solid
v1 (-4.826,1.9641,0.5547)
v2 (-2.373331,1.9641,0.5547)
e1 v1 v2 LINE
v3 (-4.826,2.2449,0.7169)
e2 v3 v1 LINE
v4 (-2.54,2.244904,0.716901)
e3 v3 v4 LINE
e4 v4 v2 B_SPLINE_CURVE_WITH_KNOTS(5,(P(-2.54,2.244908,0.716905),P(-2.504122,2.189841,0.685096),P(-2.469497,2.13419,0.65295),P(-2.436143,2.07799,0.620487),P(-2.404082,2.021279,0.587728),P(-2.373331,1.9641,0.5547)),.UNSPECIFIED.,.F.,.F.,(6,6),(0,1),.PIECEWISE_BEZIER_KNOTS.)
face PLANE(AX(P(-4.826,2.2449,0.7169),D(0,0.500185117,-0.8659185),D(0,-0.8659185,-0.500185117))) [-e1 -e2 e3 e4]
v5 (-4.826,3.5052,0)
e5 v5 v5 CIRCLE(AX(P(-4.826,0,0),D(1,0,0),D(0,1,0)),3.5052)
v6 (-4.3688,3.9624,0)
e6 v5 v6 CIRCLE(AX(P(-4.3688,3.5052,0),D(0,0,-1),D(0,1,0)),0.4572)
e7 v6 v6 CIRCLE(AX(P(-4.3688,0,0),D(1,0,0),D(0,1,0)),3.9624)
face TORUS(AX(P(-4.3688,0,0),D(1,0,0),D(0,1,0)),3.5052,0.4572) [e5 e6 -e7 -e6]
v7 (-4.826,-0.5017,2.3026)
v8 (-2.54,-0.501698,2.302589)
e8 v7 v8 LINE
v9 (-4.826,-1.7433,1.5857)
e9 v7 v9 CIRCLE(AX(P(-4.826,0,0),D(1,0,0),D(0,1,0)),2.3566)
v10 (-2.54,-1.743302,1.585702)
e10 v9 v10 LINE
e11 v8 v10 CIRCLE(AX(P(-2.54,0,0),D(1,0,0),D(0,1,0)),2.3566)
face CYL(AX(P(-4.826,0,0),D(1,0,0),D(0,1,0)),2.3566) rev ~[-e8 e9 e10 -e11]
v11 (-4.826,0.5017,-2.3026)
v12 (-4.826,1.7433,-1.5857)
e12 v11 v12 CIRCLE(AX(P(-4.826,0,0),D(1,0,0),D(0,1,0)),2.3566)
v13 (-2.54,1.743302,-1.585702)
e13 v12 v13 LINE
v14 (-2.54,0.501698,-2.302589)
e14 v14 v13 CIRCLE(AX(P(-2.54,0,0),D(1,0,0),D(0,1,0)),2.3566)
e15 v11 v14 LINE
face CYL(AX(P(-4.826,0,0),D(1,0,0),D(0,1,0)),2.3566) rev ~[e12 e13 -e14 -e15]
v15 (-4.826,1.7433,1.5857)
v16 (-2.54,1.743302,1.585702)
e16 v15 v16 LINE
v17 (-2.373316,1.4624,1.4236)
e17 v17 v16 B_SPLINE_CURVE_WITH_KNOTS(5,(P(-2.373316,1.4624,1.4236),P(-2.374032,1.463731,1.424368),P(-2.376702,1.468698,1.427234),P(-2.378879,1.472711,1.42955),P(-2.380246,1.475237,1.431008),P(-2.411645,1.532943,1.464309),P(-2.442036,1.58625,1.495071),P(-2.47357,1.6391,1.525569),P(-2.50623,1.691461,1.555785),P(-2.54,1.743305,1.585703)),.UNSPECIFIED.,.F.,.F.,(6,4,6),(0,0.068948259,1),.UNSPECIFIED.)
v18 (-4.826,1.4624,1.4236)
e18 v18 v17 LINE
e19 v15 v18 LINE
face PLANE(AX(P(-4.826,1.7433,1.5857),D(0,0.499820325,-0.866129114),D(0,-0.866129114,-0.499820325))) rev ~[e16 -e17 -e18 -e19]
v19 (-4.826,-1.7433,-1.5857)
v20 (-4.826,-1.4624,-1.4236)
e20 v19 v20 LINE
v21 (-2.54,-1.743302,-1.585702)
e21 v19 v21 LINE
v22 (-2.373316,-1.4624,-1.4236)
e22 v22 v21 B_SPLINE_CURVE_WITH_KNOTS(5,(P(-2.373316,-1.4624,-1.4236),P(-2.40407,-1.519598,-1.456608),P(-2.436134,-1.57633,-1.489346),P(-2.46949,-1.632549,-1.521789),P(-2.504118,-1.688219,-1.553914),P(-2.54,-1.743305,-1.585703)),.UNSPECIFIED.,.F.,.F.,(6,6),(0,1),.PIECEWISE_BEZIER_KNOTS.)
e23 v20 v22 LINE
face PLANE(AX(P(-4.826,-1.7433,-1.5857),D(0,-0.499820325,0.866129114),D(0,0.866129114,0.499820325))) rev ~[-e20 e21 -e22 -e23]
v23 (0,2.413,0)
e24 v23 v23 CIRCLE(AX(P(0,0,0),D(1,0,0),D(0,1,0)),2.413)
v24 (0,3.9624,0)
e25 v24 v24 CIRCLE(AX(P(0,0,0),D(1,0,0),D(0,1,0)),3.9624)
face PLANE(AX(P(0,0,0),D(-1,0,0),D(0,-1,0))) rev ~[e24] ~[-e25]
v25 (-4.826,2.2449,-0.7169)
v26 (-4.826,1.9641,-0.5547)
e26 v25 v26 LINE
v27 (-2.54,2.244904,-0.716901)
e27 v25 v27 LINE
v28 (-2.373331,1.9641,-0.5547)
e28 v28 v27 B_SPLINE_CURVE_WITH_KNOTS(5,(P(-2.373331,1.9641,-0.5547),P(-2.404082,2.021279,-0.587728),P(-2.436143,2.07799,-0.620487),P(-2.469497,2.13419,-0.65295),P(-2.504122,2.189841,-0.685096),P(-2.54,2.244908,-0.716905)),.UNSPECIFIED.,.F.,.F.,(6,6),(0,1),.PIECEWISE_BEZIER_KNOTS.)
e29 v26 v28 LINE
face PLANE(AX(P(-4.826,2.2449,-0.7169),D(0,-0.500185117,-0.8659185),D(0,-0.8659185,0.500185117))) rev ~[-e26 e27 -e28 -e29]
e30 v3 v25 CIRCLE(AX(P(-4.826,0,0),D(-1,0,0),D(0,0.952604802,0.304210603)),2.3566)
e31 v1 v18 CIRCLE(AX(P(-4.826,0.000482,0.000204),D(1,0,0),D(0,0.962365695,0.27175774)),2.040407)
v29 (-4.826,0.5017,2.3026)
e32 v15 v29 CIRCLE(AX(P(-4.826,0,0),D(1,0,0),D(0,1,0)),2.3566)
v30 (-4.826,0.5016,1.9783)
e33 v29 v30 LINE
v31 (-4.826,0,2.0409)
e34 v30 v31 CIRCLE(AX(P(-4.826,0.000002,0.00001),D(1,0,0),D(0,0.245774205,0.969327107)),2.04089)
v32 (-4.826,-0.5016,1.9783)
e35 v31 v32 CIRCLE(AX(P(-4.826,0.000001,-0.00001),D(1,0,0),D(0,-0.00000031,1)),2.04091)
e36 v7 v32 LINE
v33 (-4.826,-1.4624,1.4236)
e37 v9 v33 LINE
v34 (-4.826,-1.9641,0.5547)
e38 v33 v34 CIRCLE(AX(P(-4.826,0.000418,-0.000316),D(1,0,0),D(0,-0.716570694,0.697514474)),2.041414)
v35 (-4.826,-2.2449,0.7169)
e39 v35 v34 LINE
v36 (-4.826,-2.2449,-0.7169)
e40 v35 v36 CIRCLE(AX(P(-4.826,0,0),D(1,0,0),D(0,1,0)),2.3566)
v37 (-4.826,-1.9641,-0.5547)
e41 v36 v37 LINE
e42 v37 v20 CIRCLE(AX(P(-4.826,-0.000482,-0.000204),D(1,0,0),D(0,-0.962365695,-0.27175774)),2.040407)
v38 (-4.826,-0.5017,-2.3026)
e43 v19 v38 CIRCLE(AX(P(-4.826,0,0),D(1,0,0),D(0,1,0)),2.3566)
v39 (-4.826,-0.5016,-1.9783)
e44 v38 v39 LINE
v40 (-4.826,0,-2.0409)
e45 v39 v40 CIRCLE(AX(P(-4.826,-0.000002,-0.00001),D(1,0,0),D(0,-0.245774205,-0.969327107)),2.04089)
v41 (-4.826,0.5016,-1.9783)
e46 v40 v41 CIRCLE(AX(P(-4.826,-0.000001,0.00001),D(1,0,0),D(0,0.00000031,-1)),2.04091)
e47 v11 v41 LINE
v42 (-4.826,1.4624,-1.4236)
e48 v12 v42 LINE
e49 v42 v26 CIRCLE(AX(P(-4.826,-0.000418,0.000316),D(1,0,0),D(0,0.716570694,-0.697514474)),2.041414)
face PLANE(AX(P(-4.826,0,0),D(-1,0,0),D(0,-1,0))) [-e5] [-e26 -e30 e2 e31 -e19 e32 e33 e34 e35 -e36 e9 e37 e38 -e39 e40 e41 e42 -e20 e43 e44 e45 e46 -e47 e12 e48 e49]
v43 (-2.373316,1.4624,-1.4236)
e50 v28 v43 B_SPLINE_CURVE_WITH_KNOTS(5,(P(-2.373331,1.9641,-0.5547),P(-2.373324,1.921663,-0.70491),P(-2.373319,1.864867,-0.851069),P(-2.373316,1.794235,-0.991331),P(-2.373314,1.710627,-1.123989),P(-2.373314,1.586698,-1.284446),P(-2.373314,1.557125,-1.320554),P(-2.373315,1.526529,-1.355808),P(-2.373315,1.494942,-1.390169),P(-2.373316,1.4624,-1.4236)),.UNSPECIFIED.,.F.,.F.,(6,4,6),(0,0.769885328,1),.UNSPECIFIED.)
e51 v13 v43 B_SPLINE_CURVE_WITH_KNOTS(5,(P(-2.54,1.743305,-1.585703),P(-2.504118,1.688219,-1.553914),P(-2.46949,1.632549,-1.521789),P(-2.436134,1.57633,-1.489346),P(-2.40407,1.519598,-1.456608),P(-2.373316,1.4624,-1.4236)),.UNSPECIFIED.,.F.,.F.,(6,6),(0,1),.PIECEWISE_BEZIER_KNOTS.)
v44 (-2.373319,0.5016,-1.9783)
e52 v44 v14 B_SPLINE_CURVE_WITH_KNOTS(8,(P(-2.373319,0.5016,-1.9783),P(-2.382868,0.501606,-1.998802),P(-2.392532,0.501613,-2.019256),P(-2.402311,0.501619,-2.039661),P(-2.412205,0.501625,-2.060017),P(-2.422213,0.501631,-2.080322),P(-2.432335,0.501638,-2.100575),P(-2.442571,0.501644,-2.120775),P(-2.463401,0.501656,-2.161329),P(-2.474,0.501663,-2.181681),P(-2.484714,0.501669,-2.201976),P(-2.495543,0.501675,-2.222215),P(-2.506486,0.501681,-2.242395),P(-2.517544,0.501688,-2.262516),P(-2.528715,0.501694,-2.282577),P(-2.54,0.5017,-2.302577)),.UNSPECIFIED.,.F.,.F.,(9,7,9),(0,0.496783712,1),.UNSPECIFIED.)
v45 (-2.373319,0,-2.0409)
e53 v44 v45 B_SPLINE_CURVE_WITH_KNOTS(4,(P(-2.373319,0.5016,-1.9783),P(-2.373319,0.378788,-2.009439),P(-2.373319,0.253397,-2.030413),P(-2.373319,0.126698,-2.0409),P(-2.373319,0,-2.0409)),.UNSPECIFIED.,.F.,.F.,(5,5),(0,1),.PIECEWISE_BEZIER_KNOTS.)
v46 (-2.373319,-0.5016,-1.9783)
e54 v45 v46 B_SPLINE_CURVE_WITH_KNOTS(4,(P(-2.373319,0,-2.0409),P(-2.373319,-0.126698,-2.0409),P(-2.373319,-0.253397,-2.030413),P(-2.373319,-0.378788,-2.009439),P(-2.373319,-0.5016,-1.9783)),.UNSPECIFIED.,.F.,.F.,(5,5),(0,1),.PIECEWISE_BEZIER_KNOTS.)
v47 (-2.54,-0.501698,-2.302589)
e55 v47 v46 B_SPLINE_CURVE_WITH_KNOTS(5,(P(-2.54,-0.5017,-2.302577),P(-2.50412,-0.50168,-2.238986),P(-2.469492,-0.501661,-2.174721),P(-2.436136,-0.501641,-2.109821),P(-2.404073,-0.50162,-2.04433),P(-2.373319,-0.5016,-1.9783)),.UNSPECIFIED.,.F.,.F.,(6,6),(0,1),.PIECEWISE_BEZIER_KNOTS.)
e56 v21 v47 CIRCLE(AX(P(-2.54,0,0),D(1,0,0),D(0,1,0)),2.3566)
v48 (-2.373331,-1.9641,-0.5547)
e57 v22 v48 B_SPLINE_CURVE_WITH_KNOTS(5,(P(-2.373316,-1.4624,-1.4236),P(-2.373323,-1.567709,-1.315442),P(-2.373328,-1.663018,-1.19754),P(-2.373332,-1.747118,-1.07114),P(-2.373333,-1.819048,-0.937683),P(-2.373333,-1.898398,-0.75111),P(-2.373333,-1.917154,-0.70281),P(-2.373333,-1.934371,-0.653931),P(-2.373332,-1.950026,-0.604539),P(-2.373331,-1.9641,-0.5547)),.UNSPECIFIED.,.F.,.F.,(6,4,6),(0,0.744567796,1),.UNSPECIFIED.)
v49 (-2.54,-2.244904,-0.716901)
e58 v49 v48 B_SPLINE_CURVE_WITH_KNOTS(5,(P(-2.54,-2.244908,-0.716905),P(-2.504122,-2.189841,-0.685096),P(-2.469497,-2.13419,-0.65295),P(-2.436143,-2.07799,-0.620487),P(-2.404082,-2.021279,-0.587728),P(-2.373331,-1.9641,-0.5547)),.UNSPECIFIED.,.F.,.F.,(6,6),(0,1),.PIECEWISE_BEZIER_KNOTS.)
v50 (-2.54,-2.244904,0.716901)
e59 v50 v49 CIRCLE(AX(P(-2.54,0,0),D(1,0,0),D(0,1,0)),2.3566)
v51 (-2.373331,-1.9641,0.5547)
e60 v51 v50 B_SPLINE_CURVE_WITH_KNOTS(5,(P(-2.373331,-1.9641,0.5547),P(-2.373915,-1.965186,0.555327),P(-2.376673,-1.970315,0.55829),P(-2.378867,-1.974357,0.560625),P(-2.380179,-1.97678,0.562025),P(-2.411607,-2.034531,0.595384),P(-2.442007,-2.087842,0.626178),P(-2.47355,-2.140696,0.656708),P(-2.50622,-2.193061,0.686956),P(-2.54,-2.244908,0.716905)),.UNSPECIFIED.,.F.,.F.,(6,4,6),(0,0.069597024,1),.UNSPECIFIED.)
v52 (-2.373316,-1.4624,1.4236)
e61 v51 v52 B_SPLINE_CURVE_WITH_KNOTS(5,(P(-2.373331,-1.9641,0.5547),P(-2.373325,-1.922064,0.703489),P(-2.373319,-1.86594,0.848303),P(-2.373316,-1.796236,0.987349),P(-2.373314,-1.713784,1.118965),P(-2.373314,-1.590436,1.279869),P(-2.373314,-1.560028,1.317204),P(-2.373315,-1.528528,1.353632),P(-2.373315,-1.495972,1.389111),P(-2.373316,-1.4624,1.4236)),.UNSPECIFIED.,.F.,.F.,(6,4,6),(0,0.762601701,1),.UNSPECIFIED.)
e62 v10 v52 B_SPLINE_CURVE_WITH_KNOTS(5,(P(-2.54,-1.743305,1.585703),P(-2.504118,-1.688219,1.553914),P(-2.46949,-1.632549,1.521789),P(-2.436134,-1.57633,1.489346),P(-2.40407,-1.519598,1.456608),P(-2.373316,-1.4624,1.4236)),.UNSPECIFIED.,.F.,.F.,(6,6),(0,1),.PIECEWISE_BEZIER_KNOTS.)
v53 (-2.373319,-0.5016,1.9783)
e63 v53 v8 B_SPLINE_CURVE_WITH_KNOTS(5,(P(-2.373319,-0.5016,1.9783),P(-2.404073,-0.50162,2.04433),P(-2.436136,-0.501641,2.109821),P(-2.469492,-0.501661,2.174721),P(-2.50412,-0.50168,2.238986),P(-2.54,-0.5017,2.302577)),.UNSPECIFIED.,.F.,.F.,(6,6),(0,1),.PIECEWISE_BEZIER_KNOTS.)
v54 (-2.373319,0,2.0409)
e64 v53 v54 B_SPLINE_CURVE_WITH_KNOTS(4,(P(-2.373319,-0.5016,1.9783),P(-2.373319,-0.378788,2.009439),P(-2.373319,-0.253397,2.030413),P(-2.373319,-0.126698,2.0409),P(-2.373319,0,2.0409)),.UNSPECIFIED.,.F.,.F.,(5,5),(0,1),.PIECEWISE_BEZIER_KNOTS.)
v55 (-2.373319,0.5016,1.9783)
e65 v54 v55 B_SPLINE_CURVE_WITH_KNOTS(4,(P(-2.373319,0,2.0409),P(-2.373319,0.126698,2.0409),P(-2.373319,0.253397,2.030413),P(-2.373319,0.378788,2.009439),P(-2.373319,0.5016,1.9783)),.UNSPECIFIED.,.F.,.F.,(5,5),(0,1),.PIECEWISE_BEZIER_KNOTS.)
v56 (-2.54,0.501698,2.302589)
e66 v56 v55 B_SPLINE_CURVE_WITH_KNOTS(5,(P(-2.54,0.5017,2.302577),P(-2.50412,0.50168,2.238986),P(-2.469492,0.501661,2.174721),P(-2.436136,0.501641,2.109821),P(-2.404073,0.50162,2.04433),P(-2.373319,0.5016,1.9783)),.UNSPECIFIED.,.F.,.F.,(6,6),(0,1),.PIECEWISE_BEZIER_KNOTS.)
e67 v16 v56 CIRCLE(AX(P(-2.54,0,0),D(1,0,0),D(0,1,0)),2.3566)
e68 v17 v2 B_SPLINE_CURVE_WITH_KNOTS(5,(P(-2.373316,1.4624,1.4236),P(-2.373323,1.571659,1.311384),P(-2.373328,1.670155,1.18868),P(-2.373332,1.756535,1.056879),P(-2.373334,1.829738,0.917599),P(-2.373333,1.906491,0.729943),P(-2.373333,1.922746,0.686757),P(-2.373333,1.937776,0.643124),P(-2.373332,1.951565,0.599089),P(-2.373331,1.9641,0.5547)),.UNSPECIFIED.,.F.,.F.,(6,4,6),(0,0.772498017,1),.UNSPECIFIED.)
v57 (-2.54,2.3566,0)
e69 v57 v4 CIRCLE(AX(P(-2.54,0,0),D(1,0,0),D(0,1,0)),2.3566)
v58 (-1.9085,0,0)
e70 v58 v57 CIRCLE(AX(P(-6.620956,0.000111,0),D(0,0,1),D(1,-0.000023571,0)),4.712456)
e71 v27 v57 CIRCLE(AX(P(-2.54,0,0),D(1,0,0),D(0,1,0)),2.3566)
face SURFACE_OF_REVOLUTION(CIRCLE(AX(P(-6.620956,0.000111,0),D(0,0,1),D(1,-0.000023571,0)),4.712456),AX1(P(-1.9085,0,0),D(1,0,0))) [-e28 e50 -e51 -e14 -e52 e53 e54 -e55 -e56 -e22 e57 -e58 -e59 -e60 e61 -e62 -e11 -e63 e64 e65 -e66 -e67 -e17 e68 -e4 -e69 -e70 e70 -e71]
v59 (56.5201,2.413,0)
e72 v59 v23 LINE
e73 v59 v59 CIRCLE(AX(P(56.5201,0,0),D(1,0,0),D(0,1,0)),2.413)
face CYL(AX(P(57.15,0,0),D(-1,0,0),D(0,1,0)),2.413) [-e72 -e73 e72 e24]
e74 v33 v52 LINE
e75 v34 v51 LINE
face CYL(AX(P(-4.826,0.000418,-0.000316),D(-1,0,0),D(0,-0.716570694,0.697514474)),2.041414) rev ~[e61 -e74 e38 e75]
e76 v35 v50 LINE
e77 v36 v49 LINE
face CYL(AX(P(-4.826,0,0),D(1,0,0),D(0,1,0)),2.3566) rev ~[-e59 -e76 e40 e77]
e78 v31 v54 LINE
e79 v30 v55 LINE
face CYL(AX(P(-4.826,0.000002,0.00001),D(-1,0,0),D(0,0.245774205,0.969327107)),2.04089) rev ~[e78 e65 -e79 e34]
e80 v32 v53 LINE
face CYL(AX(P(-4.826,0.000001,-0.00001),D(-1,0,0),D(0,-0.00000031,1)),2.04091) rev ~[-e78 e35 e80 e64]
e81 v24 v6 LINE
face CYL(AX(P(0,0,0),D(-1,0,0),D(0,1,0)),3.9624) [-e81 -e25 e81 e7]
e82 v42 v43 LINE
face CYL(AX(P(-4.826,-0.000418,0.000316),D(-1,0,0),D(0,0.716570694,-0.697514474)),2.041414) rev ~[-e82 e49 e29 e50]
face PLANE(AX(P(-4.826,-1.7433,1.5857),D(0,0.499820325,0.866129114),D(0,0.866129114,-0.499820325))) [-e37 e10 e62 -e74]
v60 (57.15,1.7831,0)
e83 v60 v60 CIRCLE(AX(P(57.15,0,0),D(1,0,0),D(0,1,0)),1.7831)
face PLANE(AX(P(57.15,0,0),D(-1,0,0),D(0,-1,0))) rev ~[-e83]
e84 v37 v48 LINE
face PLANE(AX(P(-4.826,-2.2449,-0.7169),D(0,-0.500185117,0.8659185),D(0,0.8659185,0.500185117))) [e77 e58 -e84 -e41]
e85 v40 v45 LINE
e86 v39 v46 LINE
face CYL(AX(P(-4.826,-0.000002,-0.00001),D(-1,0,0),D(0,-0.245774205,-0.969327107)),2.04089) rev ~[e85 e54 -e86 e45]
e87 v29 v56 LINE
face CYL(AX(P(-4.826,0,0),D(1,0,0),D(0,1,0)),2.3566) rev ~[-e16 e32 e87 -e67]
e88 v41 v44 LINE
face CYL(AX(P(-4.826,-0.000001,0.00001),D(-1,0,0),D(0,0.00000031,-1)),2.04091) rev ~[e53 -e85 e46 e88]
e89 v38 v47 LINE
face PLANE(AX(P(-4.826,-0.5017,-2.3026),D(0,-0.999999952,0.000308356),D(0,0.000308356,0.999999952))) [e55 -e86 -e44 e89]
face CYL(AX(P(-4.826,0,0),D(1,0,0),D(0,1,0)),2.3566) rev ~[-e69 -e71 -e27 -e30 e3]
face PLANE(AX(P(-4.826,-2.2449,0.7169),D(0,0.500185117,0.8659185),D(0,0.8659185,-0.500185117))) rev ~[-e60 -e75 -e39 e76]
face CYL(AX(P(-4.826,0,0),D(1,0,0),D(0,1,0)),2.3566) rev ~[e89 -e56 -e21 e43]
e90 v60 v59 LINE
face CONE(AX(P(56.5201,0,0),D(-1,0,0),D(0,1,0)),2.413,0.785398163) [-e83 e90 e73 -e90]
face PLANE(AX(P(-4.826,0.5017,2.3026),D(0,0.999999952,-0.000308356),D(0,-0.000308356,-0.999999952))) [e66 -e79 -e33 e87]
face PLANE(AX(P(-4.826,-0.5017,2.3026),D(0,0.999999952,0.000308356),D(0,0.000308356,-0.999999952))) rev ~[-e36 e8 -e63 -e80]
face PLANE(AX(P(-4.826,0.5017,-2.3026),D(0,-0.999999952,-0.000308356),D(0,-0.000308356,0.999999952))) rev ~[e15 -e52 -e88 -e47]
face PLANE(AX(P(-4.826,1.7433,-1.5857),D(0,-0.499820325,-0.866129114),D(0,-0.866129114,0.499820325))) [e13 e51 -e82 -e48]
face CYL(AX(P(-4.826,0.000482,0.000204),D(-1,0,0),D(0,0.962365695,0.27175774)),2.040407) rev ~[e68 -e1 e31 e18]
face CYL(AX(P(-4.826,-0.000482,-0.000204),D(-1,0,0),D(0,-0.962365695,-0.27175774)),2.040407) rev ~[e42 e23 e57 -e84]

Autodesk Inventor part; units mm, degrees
ref_plane "YZ Plane" through (0, 0, 0) normal (1, 0, 0) x (0, 1, 0)
sketch "Sketch1" plane through (0, 0, 0) normal (0, 0, 1) x (1, 0, 0)
  line L0 (-4.826, 0) -> (57.15, 0)
  line L1 (57.15, 0) -> (57.15, 2.413)
  line L2 (57.15, 2.413) -> (0, 2.413)
  line L3 (0, 2.413) -> (0, 3.9624)
  line L4 (-19.3761, 0) -> (69.9044, 0) projected
  line L5 (0, -0.7925) -> (0, 4.7549) projected
  line L6 (0, 3.9624) -> (-4.826, 3.9624)
  line L7 (-4.826, 0) -> (-4.826, 3.9624)
  arc A0 (-1.9085, 0) -> (-2.54, 2.3566) centre (-6.6218, 0) ccw
  line L8 (-4.826, 2.3566) -> (-2.54, 2.3566)
  line L9 (12.7, 2.413) -> (0, 2.413) construction
  dimension "d0" = 57.15
  dimension "d1" = 4.826
  dimension "d2" = 4.826
  dimension "d5" = 7.9248
  dimension "d13" = 4.7132
  dimension "d14" = 4.7132
  dimension "d15" = 2.286
revolve "Body" add sketch "Sketch1" angle 360 about axis through (-4.826, 0, 0) along (1, 0, 0) contours A0 L8 L7 L6 L3 L5 L0 | L5 L2 L1 L0
ref_plane "IDS_WORKPLANE{1}" through (-4.826, 0, 0) normal (1, 0, 0) x (0, 0, -1)
sketch "Sketch2" plane through (-4.826, 0, 0) normal (1, 0, 0) x (0, 0, -1)
  line L0 (0, -5.5474) -> (0, 5.5474) projected
  line L1 (5.7744, 0) -> (-5.5852, 0) projected
  circle A0 centre (0, 0) radius 3.9624 projected
  line L2 (2.3026, 0.5017) -> (1.9783, 0.5016)
  line L3 (0, 0) -> (2.3026, 0.5017) construction
  line L4 (0, 0) -> (4.1516, 3.7764) construction
  line L5 (0, 0) -> (0.7169, 2.2449) construction
  line L6 (0, 0) -> (1.1783, 2.0409) construction
  line L7 (0.7169, 2.2449) -> (0.5547, 1.9641)
  line L8 (1.5857, 1.7433) -> (1.4236, 1.4624)
  line L9 (0, 0) -> (1.5857, 1.7433) construction
  arc A1 (2.0409, 0) -> (1.9783, 0.5016) centre (0, 0) ccw
  arc A2 (1.4236, 1.4624) -> (0.5547, 1.9641) centre (0, 0) ccw
  arc A3 (2.3566, 0) -> (2.3026, 0.5017) centre (0, 0) ccw
  arc A4 (1.5857, 1.7433) -> (0.7169, 2.2449) centre (0, 0) ccw
  arc A5 (2.3026, 0.5017) -> (1.3897, 1.9032) centre (0, 0) ccw construction
  arc A6 (1.9783, 0.5016) -> (1.4236, 1.4624) centre (0, 0) ccw construction
  line L10 (2.3026, -0.5017) -> (1.9783, -0.5016)
  line L11 (0.7169, -2.2449) -> (0.5547, -1.9641)
  line L12 (1.5857, -1.7433) -> (1.4236, -1.4624)
  arc A7 (1.9783, -0.5016) -> (2.0409, 0) centre (0, 0) ccw
  arc A8 (0.5547, -1.9641) -> (1.4236, -1.4624) centre (0, 0) ccw
  arc A9 (2.3026, -0.5017) -> (2.3566, 0) centre (0, 0) ccw
  arc A10 (0.7169, -2.2449) -> (1.5857, -1.7433) centre (0, 0) ccw
  line L13 (-2.3026, 0.5017) -> (-1.9783, 0.5016)
  line L14 (-0.7169, 2.2449) -> (-0.5547, 1.9641)
  line L15 (-1.5857, 1.7433) -> (-1.4236, 1.4624)
  arc A11 (-1.9783, 0.5016) -> (-2.0409, 0) centre (0, 0) ccw
  arc A12 (-0.5547, 1.9641) -> (-1.4236, 1.4624) centre (0, 0) ccw
  arc A13 (-2.3026, 0.5017) -> (-2.3566, 0) centre (0, 0) ccw
  arc A14 (-0.7169, 2.2449) -> (-1.5857, 1.7433) centre (0, 0) ccw
  line L16 (-0.7169, -2.2449) -> (-0.5547, -1.9641)
  arc A15 (-1.4236, -1.4624) -> (-0.5547, -1.9641) centre (0, 0) ccw
  line L17 (-1.5857, -1.7433) -> (-1.4236, -1.4624)
  arc A16 (-1.5857, -1.7433) -> (-0.7169, -2.2449) centre (0, 0) ccw
  arc A17 (-2.0409, 0) -> (-1.9783, -0.5016) centre (0, 0) ccw
  line L18 (-2.3026, -0.5017) -> (-1.9783, -0.5016)
  arc A18 (-2.3566, 0) -> (-2.3026, -0.5017) centre (0, 0) ccw
  point P0 (1.1783, -2.0409)
  point P1 (-1.1783, 2.0409)
  point P2 (-1.1783, -2.0409)
  dimension "d19" = 0.5017
  dimension "d20" = 1.0033
  dimension "d21" = 35.419
  dimension "d22" = 4.7132
  dimension "d23" = 4.0818
extrude "Slot" add sketch "Sketch2" along normal up to next contours A1 L2 A3 L1 | L1 A9 L10 A7 | A17 L18 A18 L1 | L1 A13 L13 A11 | A4 L8 A2 L7 | L11 A8 L12 A10 | L14 A12 L15 A14 | A16 L17 A15 L16
fillet "Fillet1" radius 0.4572 1 edges at (-4.826, -3.9624, 0)
thread "Thread" size "10-24 UNC" class "2A" standard "ANSI Unified Screw Threads" length 22.098
chamfer "Chamfer1" distance 0.6299 distance2 0.6299 1 edges at (57.15, -2.413, 0) measured on face at (57.15, -0.9495, -0.1286)
ref_plane "Work Plane2" through (-2.413, 0, 0) normal (0, 0, -1) x (1, 0, 0)
equation "\"d19\" = 0.5 * SBR"
equation "\"d20\" = SBR"
equation "\"d22\" = 1.1547 * SW"
equation "\"d23\" = SW"
equation "\"d17\" = INTI"
equation "\"d24\" = RR"
equation "\"d6\" = GEL"
equation "\"d9\" = -0.5 * SPD + 0.5 * NND"
equation "\"d10\" = GUL"
equation "\"d0\" = NLG"
equation "\"d1\" = KOH"
equation "\"d2\" = NND"
equation "\"d5\" = KOD"
equation "\"d13\" = 1.1547 * SW"
equation "\"d14\" = 1.1547 * SW"
equation "\"d15\" = INTI"
equation "\"NND\" = 4.826"
equation "\"NLG\" = 57.15"
equation "\"GEL\" = 22.098"
equation "\"KOD\" = 7.9248"
equation "\"KOH\" = 4.826"
equation "\"SPD\" = GD1"
equation "\"GUL\" = 0.62992"
equation "\"SBR\" = 1.0033"
equation "\"INTI\" = 2.286"
equation "\"d11\" = -KOH"
equation "\"SW\" = 4.08178"
equation "\"d16\" = 1.1547 * SW"
equation "\"d18\" = SW"
equation "\"RR\" = 0.4572"
equation "\"TOA\" = 30deg"
equation "\"GD1\" = 3.56616"
equation "\"THREADDIA\" = 4.826"
equation "\"BDM\" = NND"
equation "\"GD\" = NND"
equation "\"GAL\" = 2.64592"
equation "\"E0\" = 4.71678"
properties part number "ANSI B18.3 - 10-24 UNC - 2.25" material "Steel, Mild"
